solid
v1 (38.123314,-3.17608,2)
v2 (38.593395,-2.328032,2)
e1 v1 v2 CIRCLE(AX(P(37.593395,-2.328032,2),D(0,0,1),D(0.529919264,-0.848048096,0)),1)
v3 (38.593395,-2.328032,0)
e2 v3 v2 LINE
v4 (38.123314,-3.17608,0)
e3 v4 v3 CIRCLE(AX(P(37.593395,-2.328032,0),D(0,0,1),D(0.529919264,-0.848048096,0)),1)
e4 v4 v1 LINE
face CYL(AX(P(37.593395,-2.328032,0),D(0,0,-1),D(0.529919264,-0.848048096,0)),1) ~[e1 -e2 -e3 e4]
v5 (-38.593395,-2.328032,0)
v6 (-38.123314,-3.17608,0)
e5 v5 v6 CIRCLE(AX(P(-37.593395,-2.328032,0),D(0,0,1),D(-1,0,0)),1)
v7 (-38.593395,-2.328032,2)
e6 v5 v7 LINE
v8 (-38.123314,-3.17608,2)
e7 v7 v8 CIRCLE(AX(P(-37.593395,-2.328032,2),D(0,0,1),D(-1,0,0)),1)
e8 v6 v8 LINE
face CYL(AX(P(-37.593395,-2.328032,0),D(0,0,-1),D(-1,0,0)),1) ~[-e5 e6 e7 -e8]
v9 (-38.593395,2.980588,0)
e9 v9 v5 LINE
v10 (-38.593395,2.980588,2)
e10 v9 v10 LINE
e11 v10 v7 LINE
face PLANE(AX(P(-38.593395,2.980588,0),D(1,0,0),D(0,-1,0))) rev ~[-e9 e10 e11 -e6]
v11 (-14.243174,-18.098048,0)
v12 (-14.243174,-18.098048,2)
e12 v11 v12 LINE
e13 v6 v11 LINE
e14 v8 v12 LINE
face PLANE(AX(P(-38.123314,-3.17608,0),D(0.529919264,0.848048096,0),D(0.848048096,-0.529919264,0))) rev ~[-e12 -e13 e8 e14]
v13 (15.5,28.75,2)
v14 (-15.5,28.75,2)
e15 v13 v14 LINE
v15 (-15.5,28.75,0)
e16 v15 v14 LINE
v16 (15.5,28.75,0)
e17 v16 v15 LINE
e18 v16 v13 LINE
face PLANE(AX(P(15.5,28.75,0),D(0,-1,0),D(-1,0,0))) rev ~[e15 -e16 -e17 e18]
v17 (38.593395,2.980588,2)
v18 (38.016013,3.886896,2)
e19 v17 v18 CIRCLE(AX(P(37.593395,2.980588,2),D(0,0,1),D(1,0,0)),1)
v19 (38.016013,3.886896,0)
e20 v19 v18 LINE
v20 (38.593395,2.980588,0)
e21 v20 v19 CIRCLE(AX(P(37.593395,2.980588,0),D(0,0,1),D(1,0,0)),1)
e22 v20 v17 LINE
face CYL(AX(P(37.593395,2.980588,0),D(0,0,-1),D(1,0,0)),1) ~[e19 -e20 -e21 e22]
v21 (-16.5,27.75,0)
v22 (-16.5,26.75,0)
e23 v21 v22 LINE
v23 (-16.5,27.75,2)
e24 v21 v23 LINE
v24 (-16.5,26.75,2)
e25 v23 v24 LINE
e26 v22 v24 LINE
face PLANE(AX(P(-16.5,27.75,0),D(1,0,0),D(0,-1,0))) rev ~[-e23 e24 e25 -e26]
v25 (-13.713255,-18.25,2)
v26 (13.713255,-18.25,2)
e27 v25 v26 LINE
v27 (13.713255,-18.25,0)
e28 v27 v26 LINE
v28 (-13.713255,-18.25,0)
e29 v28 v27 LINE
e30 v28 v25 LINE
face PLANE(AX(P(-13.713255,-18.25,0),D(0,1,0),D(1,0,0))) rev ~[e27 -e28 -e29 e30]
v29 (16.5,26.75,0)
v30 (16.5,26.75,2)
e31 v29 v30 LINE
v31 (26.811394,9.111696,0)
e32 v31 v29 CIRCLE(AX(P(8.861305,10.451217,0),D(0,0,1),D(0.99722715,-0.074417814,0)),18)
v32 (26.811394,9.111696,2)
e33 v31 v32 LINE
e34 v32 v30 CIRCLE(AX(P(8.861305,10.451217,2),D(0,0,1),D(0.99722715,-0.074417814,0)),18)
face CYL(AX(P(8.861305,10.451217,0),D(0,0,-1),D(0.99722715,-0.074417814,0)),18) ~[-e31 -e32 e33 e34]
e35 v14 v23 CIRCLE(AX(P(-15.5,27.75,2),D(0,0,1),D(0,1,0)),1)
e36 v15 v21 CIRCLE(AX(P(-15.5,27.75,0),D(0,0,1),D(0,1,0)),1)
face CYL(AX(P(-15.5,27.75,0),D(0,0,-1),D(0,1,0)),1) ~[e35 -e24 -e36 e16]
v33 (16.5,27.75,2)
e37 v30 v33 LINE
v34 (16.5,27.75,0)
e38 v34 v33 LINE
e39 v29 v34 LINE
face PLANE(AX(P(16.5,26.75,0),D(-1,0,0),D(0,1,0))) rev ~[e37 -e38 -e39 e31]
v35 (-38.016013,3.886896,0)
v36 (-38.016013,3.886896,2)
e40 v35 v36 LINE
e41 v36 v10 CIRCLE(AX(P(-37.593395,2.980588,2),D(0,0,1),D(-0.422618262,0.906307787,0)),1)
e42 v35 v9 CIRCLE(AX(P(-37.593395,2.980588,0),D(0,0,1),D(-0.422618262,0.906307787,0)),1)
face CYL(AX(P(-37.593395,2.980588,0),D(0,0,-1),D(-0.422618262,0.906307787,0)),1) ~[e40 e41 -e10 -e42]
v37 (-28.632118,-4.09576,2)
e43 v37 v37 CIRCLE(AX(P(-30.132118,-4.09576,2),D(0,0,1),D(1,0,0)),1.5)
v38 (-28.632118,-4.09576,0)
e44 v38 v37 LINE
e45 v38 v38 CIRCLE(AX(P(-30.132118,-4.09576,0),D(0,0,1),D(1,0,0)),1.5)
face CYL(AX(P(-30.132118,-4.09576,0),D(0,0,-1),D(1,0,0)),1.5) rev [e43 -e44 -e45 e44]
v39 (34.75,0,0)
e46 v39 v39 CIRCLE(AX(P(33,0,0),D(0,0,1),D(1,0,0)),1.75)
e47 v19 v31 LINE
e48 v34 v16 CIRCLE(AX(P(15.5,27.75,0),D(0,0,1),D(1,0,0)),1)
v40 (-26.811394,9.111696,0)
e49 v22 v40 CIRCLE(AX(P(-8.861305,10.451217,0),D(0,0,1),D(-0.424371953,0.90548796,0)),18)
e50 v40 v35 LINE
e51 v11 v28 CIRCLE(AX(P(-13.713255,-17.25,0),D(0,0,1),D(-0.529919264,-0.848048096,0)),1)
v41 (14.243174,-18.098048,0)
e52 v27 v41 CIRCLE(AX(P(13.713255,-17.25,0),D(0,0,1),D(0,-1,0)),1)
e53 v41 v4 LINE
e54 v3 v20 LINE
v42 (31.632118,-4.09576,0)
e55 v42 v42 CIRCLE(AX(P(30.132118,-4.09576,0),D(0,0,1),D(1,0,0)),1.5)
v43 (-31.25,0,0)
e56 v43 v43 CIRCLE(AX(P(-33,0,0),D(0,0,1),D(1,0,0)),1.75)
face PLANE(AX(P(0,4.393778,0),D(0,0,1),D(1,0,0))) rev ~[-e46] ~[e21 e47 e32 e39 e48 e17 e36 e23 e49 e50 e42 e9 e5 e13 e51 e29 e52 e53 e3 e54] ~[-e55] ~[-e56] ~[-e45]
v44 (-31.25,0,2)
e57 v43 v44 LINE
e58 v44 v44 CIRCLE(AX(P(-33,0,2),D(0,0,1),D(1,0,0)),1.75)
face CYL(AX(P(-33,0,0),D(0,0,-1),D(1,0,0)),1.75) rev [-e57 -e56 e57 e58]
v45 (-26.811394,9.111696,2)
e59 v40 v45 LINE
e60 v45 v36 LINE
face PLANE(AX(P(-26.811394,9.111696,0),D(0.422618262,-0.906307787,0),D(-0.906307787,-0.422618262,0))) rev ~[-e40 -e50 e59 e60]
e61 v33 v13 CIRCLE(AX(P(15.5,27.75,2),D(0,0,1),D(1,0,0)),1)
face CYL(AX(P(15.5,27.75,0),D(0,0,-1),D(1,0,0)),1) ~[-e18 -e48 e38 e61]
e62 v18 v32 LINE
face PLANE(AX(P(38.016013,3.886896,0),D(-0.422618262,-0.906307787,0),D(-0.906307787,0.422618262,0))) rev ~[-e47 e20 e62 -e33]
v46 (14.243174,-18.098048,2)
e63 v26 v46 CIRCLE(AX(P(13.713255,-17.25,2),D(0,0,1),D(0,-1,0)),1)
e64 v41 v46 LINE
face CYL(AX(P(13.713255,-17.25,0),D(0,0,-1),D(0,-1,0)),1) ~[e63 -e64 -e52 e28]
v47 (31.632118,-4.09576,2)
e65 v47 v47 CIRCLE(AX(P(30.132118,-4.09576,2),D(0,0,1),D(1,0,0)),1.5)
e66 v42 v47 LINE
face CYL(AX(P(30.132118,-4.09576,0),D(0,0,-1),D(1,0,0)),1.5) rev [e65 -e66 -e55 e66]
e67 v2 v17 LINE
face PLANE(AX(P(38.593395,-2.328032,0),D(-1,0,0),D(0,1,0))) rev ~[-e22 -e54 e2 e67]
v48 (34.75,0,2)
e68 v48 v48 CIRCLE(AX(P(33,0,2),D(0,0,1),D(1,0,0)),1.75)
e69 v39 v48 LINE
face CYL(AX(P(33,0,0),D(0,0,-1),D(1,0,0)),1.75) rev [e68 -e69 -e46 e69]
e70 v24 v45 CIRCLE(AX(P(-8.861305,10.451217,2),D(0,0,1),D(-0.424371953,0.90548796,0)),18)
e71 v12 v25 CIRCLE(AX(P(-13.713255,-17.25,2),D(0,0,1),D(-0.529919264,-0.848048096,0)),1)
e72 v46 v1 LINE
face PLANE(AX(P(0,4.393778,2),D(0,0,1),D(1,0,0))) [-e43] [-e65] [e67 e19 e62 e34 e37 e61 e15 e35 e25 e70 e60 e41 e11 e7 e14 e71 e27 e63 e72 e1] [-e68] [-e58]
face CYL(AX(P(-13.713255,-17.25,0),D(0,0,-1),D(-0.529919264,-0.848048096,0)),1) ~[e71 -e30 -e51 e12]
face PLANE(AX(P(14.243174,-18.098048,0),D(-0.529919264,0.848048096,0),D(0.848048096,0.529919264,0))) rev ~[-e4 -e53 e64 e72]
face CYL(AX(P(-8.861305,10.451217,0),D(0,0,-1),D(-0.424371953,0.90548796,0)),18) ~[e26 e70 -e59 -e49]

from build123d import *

# Parameters (mm, degrees)
F0_R     = 1.5
F0_R_2   = 1.75
F1_DEPTH = 2


# Not quite as in the source:
# - a feature names something its author has since deleted; it is built from what else it names


with BuildPart() as f1:
    # F0 (on Top) → F1 (new body)
    with BuildSketch(Plane.XY):
        with BuildLine():
            Line((15.5, 28.75), (0, 28.75))
            Line((0, 28.75), (-15.5, 28.75))
            ThreePointArc((-15.5, 28.75), (-16.2071067812, 28.4571067812), (-16.5, 27.75))
            Line((-16.5, 27.75), (-16.5, 26.75))
            ThreePointArc((-16.5, 26.75), (-24.4007355432, 19.5356040873), (-26.8113935571, 9.1116960654))
            Line((-26.8113935571, 9.1116960654), (-38.0160130503, 3.886896189))
            ThreePointArc((-38.0160130503, 3.886896189), (-38.4367862343, 3.5178880103), (-38.5933947885, 2.980588402))
            Line((-38.5933947885, 2.980588402), (-38.5933947885, -2.3280322858))
            ThreePointArc((-38.5933947885, -2.3280322858), (-38.4680144957, -2.812841906), (-38.1233140528, -3.1760803819))
            Line((-38.1233140528, -3.1760803819), (-14.2431738785, -18.0980480962))
            ThreePointArc((-14.2431738785, -18.0980480962), (-13.9888919701, -18.2112616959), (-13.7132546142, -18.25))
            Line((-13.7132546142, -18.25), (0, -18.25))
            Line((0, -18.25), (13.7132546142, -18.25))
            ThreePointArc((13.7132546142, -18.25), (13.9888919701, -18.2112616959), (14.2431738785, -18.0980480962))
            Line((14.2431738785, -18.0980480962), (38.1233140528, -3.1760803819))
            ThreePointArc((38.1233140528, -3.1760803819), (38.4680144957, -2.812841906), (38.5933947885, -2.3280322858))
            Line((38.5933947885, -2.3280322858), (38.5933947885, 2.980588402))
            ThreePointArc((38.5933947885, 2.980588402), (38.4367862343, 3.5178880103), (38.0160130503, 3.886896189))
            Line((38.0160130503, 3.886896189), (26.8113935571, 9.1116960654))
            ThreePointArc((26.8113935571, 9.1116960654), (24.4007355432, 19.5356040873), (16.5, 26.75))
            Line((16.5, 26.75), (16.5, 27.75))
            ThreePointArc((16.5, 27.75), (16.2071067812, 28.4571067812), (15.5, 28.75))
        make_face()
        with Locations((-30.1321178182, -4.0957602214)):
            Circle(F0_R, mode=Mode.SUBTRACT)
        with Locations((-33, 0)):
            Circle(F0_R_2, mode=Mode.SUBTRACT)
        with Locations((30.1321178182, -4.0957602214)):
            Circle(F0_R, mode=Mode.SUBTRACT)
        with Locations((33, 0)):
            Circle(F0_R_2, mode=Mode.SUBTRACT)
    extrude(amount=F1_DEPTH)


solid = f1.part
